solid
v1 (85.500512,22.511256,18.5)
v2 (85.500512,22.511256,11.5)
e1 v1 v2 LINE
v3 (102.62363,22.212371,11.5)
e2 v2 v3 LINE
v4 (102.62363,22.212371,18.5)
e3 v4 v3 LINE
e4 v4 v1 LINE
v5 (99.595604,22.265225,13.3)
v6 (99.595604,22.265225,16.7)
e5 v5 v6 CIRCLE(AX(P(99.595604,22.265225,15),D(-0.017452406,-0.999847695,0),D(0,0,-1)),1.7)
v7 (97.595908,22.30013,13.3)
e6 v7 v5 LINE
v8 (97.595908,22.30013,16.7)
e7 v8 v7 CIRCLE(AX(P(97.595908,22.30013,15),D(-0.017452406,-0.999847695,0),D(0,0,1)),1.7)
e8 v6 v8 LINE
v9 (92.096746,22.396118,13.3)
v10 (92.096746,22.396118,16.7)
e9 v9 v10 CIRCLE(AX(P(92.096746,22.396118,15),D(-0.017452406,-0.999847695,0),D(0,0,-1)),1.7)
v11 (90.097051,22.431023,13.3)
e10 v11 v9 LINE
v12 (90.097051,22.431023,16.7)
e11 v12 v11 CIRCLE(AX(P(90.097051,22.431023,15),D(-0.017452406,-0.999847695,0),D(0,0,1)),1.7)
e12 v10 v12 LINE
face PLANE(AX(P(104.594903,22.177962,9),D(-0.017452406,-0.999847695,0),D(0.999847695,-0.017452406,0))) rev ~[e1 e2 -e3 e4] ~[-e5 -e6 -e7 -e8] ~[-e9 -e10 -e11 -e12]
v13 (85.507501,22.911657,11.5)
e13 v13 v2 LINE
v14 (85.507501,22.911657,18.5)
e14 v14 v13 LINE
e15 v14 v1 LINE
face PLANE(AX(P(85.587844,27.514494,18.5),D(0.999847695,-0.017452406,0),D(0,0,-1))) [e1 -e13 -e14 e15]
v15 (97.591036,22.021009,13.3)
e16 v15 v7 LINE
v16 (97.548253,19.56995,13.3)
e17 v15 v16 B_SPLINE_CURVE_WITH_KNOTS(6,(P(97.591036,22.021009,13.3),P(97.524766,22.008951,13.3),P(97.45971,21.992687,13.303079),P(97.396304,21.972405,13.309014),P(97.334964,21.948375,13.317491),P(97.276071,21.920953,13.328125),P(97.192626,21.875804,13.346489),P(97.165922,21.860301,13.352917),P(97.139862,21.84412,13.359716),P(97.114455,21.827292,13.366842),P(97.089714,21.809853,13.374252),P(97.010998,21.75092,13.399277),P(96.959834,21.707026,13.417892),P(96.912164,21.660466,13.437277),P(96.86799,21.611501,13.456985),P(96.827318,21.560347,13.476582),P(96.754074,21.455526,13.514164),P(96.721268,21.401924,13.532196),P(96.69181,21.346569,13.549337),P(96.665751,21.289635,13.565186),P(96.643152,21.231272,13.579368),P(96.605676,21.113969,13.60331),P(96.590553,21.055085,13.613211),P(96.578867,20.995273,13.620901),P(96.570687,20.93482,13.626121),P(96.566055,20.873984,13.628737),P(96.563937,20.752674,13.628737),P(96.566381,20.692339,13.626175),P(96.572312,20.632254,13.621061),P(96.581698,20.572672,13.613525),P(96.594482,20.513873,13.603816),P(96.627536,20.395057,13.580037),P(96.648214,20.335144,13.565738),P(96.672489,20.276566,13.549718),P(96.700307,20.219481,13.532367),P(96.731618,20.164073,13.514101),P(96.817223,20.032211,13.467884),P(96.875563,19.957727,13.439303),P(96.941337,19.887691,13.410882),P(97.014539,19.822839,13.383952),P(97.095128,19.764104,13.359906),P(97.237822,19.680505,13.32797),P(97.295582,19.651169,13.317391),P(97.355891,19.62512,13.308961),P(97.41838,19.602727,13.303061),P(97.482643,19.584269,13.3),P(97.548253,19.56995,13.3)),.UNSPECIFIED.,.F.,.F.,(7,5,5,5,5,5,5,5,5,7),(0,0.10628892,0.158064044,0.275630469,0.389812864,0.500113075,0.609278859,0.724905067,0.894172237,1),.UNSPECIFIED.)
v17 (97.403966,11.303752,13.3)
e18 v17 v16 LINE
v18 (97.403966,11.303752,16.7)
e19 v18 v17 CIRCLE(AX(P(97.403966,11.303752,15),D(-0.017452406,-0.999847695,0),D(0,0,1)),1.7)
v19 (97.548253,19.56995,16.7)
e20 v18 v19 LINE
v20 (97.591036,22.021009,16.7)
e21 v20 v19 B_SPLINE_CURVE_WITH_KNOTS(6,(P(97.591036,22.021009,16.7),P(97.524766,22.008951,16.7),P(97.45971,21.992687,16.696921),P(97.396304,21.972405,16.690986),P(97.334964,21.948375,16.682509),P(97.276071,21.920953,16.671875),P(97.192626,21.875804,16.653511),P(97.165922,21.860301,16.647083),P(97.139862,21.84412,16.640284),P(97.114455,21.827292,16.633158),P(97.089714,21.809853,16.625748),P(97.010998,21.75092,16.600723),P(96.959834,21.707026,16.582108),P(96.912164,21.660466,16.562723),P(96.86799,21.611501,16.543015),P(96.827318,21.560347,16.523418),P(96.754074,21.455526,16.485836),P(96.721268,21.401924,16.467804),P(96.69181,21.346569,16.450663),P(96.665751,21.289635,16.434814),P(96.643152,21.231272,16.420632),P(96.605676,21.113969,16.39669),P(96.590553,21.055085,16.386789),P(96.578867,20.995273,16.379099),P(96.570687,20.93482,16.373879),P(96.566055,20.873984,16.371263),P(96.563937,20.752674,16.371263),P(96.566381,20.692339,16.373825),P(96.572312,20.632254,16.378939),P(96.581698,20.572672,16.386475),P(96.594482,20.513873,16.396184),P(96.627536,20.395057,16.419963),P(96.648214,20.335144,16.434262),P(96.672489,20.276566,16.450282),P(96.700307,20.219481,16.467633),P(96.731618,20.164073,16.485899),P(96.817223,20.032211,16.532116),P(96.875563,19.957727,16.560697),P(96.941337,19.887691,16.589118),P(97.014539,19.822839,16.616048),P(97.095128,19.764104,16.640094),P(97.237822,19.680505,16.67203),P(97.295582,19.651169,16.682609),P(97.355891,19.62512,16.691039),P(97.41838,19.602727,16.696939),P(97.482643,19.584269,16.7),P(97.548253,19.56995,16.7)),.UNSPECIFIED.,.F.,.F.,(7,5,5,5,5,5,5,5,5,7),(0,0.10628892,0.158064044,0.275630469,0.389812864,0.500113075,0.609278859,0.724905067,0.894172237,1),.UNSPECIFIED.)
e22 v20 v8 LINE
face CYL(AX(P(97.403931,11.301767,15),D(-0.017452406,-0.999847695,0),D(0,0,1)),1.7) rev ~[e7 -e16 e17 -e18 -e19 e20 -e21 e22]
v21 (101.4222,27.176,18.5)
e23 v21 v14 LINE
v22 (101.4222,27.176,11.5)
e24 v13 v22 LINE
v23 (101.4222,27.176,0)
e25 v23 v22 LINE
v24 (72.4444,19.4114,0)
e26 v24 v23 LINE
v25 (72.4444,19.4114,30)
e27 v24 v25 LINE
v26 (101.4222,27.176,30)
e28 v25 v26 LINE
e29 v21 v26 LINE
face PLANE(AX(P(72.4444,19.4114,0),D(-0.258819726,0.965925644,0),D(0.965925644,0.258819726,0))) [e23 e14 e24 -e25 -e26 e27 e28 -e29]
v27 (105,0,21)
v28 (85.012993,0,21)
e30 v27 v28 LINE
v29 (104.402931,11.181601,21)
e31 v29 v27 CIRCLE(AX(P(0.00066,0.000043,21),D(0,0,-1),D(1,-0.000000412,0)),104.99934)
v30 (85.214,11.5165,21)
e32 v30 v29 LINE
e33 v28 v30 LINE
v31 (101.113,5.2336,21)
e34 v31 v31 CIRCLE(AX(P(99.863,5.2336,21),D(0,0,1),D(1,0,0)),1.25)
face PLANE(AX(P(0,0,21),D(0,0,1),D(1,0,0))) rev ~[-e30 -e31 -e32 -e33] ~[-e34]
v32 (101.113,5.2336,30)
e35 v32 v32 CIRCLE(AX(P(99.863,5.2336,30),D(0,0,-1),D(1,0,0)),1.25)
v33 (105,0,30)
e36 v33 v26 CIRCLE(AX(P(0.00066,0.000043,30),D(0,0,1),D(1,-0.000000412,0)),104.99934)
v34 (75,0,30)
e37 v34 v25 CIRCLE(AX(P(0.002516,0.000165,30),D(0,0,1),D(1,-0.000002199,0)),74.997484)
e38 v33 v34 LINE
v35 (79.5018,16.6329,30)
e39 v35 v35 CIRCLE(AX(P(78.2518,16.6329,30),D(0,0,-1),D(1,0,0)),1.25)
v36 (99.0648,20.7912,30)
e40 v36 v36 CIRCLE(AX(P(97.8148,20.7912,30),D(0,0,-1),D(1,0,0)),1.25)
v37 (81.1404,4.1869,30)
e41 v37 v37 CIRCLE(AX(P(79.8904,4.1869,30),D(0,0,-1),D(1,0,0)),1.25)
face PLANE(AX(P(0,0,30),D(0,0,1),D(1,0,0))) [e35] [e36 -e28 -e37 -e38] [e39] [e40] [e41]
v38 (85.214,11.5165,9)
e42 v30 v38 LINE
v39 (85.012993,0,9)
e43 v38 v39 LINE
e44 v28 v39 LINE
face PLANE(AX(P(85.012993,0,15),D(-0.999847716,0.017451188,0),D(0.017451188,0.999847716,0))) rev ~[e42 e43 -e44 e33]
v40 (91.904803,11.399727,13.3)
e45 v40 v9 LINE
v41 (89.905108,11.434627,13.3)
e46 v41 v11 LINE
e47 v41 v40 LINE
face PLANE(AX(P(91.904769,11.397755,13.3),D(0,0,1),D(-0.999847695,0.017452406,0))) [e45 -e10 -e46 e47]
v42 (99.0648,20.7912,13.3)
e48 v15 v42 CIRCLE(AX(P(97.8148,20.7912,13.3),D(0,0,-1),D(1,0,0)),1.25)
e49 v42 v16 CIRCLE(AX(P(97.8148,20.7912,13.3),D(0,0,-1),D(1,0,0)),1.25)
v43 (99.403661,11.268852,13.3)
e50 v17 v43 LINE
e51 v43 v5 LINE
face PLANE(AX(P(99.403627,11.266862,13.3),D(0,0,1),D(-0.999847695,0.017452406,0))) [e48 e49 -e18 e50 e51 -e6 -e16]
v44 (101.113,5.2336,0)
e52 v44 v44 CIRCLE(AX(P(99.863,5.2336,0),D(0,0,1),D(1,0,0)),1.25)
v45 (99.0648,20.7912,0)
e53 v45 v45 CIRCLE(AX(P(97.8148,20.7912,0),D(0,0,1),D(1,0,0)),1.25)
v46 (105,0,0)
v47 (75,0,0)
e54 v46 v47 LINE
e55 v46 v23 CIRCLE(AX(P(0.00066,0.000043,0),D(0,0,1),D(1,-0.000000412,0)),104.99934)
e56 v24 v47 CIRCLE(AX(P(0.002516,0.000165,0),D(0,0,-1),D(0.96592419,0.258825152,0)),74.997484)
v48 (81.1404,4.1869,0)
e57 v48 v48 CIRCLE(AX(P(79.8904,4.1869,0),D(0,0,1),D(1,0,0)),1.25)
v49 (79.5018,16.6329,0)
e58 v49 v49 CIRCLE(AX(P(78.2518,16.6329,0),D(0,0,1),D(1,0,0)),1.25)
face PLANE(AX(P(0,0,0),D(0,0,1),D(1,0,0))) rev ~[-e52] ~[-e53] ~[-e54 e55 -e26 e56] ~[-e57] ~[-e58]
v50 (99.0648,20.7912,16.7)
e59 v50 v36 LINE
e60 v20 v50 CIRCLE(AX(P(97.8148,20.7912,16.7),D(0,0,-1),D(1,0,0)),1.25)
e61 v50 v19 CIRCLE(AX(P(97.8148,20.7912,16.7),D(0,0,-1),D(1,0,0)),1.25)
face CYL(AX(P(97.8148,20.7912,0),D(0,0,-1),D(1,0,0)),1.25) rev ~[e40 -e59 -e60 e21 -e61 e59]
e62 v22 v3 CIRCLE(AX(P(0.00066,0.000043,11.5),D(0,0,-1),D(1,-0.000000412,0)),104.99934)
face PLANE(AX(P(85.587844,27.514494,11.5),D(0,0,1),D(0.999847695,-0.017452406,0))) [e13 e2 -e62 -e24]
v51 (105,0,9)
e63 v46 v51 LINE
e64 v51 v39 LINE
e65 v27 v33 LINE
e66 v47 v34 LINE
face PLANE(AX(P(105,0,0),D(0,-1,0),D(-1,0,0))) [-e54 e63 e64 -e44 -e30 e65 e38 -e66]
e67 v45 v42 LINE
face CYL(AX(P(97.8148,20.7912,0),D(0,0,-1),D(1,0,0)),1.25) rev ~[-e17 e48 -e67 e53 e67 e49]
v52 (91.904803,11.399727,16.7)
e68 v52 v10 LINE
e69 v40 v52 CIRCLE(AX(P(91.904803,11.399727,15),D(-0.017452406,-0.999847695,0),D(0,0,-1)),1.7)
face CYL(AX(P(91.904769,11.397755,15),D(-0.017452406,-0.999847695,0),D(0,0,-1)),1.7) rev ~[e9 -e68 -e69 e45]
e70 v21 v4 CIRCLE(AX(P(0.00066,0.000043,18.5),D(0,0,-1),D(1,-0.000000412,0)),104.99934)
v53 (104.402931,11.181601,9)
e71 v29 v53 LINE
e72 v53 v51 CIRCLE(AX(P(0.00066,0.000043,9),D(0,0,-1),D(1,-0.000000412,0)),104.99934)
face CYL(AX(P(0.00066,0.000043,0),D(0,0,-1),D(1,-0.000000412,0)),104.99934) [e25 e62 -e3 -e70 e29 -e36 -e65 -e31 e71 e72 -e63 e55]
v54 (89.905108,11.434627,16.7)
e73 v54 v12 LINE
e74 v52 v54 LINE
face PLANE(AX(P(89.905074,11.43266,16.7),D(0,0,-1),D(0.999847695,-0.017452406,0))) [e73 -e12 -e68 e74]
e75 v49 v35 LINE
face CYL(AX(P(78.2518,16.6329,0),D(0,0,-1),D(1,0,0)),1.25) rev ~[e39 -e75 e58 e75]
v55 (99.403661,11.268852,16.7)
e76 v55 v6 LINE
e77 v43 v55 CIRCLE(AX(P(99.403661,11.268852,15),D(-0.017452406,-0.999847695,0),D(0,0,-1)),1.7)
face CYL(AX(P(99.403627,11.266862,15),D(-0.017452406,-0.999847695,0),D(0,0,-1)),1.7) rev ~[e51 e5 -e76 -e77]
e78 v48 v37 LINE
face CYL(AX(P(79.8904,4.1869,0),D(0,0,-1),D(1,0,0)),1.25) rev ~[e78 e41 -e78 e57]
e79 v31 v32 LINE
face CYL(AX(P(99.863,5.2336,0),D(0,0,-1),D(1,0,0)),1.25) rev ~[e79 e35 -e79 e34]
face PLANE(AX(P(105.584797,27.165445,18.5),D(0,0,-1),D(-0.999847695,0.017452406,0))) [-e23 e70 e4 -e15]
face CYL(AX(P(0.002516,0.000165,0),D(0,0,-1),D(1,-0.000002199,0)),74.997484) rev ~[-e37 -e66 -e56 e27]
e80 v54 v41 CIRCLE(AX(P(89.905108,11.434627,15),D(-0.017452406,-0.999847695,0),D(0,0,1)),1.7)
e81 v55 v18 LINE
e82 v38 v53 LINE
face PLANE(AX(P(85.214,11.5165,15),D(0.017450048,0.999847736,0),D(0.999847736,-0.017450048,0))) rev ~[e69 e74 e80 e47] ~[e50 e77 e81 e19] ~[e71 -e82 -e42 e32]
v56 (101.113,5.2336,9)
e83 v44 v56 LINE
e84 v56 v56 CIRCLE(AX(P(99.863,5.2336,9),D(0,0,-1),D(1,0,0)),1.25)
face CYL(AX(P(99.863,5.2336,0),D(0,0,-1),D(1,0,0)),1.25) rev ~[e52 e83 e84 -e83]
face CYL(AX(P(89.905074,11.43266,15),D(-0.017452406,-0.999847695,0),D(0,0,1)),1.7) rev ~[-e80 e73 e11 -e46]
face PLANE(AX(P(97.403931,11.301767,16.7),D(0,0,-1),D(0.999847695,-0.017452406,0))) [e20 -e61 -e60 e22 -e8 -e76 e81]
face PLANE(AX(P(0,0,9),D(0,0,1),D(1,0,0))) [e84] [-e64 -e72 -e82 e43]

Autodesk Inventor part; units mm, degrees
ref_plane "YZ Plane" through (0, 0, 0) normal (1, 0, 0) x (0, 1, 0)
ref_plane "XZ Plane" through (0, 0, 0) normal (0, 1, 0) x (-1, 0, 0)
ref_plane "XY Plane" through (0, 0, 0) normal (0, 0, 1) x (1, 0, 0)
sketch "Sketch1" plane through (0, 0, 0) normal (0, 0, 1) x (1, 0, 0)
  arc A0 (75, 0) -> (72.4444, 19.4114) centre (0, 0) ccw
  arc A1 (105, 0) -> (101.4222, 27.176) centre (0, 0) ccw
  line L0 (105, 0) -> (75, 0)
  line L1 (72.4444, 19.4114) -> (101.4222, 27.176)
  line L2 (75, 0) -> (0, 0)
  line L3 (0, 0) -> (72.4444, 19.4114)
  circle A2 centre (78.2518, 16.6329) radius 1.25
  circle A3 centre (79.8904, 4.1869) radius 1.25
  circle A4 centre (97.8148, 20.7912) radius 1.25
  circle A5 centre (99.863, 5.2336) radius 1.25
  line L4 (0, 0) -> (78.2518, 16.6329)
  line L5 (78.2518, 16.6329) -> (97.8148, 20.7912)
  line L6 (99.863, 5.2336) -> (79.8904, 4.1869)
  line L7 (79.8904, 4.1869) -> (0, 0)
  dimension "d0" = 20
  dimension "d1" = 15
  dimension "d2" = 3
  dimension "d3" = 3
  dimension "d4" = 2.5
  dimension "d5" = 80
  dimension "d6" = 75
  dimension "d7" = 105
  dimension "d8" = 80
  dimension "d9" = 20
extrude "Extrusion1" add sketch "Sketch1" along normal blind 30 contours A0 L1 A1 L0
ref_plane "Work Plane1" through (0, 0, 15) normal (0, 0, 1) x (1, 0, 0)
sketch "Sketch2" plane through (0, 0, 15) normal (0, 0, 1) x (1, 0, 0)
  line L0 (75, 0) -> (105, 0) projected
  line L1 (75, 0) -> (0, 0)
  line L2 (0, 0) -> (189.2794, -3.3039)
  line L3 (84.9871, -1.4835) -> (85.214, 11.5165)
  line L4 (85.214, 11.5165) -> (105.2109, 11.1675)
  line L5 (105.2109, 11.1675) -> (104.984, -1.8325)
  dimension "d12" = 13
  dimension "d13" = 1
  dimension "d14" = 85
  dimension "d15" = 105
extrude "Extrusion2" cut sketch "Sketch2" along normal mid plane 12 contours L3 L4 L5 L2
sketch "Sketch3" plane through (104.4029, 11.1816, 9) normal (-0.0174524, -0.9998477, 0) x (0.9998477, -0.0174524, 0)
  arc A0 (-5, 4.3) -> (-5, 7.7) centre (-5, 6) ccw
  arc A1 (-7, 7.7) -> (-7, 4.3) centre (-7, 6) ccw
  line L0 (-7, 7.7) -> (-5, 7.7)
  line L1 (-5, 4.3) -> (-7, 4.3)
  line L2 (-19.1919, 12) -> (0.7921, 12) projected
  line L3 (0, 12) -> (0, 0) projected
  point P0 (-104.1919, -9)
  dimension "d19" = 3.4
  dimension "d20" = 6
  dimension "d21" = 5
  dimension "d22" = 2
extrude "Extrusion3" cut sketch "Sketch3" against normal blind 20
pattern_linear "Rectangular Pattern1" count 2 spacing 7.5 along (-0.9998477, 0.0174524, 0) of "Extrusion3"
ref_plane "Work Plane2" through (104.6822, 27.1792, 9) normal (-0.0174524, -0.9998477, 0) x (0.9998477, -0.0174524, 0)
sketch "Sketch5" plane through (104.6822, 27.1792, 9) normal (-0.0174524, -0.9998477, 0) x (0.9998477, -0.0174524, 0)
  line L0 (-19.0973, 2.5) -> (0.9027, 2.5)
  line L1 (0.9027, 2.5) -> (0.9027, 9.5)
  line L2 (0.9027, 9.5) -> (-19.0973, 9.5)
  line L3 (-19.0973, 9.5) -> (-19.0973, 2.5)
  line L4 (-3.2594, 21) -> (-32.0973, 21) projected
  line L5 (-32.0973, -9) -> (-32.0973, 21) projected
  point P0 (-104.1919, -9)
  point P1 (-19.0973, 6)
  dimension "d29" = 7
  dimension "d30" = 15
  dimension "d31" = 13
  dimension "d32" = 20
extrude "Extrusion4" cut sketch "Sketch5" along normal blind 5
properties part number "load_cell_mounting_block2"
